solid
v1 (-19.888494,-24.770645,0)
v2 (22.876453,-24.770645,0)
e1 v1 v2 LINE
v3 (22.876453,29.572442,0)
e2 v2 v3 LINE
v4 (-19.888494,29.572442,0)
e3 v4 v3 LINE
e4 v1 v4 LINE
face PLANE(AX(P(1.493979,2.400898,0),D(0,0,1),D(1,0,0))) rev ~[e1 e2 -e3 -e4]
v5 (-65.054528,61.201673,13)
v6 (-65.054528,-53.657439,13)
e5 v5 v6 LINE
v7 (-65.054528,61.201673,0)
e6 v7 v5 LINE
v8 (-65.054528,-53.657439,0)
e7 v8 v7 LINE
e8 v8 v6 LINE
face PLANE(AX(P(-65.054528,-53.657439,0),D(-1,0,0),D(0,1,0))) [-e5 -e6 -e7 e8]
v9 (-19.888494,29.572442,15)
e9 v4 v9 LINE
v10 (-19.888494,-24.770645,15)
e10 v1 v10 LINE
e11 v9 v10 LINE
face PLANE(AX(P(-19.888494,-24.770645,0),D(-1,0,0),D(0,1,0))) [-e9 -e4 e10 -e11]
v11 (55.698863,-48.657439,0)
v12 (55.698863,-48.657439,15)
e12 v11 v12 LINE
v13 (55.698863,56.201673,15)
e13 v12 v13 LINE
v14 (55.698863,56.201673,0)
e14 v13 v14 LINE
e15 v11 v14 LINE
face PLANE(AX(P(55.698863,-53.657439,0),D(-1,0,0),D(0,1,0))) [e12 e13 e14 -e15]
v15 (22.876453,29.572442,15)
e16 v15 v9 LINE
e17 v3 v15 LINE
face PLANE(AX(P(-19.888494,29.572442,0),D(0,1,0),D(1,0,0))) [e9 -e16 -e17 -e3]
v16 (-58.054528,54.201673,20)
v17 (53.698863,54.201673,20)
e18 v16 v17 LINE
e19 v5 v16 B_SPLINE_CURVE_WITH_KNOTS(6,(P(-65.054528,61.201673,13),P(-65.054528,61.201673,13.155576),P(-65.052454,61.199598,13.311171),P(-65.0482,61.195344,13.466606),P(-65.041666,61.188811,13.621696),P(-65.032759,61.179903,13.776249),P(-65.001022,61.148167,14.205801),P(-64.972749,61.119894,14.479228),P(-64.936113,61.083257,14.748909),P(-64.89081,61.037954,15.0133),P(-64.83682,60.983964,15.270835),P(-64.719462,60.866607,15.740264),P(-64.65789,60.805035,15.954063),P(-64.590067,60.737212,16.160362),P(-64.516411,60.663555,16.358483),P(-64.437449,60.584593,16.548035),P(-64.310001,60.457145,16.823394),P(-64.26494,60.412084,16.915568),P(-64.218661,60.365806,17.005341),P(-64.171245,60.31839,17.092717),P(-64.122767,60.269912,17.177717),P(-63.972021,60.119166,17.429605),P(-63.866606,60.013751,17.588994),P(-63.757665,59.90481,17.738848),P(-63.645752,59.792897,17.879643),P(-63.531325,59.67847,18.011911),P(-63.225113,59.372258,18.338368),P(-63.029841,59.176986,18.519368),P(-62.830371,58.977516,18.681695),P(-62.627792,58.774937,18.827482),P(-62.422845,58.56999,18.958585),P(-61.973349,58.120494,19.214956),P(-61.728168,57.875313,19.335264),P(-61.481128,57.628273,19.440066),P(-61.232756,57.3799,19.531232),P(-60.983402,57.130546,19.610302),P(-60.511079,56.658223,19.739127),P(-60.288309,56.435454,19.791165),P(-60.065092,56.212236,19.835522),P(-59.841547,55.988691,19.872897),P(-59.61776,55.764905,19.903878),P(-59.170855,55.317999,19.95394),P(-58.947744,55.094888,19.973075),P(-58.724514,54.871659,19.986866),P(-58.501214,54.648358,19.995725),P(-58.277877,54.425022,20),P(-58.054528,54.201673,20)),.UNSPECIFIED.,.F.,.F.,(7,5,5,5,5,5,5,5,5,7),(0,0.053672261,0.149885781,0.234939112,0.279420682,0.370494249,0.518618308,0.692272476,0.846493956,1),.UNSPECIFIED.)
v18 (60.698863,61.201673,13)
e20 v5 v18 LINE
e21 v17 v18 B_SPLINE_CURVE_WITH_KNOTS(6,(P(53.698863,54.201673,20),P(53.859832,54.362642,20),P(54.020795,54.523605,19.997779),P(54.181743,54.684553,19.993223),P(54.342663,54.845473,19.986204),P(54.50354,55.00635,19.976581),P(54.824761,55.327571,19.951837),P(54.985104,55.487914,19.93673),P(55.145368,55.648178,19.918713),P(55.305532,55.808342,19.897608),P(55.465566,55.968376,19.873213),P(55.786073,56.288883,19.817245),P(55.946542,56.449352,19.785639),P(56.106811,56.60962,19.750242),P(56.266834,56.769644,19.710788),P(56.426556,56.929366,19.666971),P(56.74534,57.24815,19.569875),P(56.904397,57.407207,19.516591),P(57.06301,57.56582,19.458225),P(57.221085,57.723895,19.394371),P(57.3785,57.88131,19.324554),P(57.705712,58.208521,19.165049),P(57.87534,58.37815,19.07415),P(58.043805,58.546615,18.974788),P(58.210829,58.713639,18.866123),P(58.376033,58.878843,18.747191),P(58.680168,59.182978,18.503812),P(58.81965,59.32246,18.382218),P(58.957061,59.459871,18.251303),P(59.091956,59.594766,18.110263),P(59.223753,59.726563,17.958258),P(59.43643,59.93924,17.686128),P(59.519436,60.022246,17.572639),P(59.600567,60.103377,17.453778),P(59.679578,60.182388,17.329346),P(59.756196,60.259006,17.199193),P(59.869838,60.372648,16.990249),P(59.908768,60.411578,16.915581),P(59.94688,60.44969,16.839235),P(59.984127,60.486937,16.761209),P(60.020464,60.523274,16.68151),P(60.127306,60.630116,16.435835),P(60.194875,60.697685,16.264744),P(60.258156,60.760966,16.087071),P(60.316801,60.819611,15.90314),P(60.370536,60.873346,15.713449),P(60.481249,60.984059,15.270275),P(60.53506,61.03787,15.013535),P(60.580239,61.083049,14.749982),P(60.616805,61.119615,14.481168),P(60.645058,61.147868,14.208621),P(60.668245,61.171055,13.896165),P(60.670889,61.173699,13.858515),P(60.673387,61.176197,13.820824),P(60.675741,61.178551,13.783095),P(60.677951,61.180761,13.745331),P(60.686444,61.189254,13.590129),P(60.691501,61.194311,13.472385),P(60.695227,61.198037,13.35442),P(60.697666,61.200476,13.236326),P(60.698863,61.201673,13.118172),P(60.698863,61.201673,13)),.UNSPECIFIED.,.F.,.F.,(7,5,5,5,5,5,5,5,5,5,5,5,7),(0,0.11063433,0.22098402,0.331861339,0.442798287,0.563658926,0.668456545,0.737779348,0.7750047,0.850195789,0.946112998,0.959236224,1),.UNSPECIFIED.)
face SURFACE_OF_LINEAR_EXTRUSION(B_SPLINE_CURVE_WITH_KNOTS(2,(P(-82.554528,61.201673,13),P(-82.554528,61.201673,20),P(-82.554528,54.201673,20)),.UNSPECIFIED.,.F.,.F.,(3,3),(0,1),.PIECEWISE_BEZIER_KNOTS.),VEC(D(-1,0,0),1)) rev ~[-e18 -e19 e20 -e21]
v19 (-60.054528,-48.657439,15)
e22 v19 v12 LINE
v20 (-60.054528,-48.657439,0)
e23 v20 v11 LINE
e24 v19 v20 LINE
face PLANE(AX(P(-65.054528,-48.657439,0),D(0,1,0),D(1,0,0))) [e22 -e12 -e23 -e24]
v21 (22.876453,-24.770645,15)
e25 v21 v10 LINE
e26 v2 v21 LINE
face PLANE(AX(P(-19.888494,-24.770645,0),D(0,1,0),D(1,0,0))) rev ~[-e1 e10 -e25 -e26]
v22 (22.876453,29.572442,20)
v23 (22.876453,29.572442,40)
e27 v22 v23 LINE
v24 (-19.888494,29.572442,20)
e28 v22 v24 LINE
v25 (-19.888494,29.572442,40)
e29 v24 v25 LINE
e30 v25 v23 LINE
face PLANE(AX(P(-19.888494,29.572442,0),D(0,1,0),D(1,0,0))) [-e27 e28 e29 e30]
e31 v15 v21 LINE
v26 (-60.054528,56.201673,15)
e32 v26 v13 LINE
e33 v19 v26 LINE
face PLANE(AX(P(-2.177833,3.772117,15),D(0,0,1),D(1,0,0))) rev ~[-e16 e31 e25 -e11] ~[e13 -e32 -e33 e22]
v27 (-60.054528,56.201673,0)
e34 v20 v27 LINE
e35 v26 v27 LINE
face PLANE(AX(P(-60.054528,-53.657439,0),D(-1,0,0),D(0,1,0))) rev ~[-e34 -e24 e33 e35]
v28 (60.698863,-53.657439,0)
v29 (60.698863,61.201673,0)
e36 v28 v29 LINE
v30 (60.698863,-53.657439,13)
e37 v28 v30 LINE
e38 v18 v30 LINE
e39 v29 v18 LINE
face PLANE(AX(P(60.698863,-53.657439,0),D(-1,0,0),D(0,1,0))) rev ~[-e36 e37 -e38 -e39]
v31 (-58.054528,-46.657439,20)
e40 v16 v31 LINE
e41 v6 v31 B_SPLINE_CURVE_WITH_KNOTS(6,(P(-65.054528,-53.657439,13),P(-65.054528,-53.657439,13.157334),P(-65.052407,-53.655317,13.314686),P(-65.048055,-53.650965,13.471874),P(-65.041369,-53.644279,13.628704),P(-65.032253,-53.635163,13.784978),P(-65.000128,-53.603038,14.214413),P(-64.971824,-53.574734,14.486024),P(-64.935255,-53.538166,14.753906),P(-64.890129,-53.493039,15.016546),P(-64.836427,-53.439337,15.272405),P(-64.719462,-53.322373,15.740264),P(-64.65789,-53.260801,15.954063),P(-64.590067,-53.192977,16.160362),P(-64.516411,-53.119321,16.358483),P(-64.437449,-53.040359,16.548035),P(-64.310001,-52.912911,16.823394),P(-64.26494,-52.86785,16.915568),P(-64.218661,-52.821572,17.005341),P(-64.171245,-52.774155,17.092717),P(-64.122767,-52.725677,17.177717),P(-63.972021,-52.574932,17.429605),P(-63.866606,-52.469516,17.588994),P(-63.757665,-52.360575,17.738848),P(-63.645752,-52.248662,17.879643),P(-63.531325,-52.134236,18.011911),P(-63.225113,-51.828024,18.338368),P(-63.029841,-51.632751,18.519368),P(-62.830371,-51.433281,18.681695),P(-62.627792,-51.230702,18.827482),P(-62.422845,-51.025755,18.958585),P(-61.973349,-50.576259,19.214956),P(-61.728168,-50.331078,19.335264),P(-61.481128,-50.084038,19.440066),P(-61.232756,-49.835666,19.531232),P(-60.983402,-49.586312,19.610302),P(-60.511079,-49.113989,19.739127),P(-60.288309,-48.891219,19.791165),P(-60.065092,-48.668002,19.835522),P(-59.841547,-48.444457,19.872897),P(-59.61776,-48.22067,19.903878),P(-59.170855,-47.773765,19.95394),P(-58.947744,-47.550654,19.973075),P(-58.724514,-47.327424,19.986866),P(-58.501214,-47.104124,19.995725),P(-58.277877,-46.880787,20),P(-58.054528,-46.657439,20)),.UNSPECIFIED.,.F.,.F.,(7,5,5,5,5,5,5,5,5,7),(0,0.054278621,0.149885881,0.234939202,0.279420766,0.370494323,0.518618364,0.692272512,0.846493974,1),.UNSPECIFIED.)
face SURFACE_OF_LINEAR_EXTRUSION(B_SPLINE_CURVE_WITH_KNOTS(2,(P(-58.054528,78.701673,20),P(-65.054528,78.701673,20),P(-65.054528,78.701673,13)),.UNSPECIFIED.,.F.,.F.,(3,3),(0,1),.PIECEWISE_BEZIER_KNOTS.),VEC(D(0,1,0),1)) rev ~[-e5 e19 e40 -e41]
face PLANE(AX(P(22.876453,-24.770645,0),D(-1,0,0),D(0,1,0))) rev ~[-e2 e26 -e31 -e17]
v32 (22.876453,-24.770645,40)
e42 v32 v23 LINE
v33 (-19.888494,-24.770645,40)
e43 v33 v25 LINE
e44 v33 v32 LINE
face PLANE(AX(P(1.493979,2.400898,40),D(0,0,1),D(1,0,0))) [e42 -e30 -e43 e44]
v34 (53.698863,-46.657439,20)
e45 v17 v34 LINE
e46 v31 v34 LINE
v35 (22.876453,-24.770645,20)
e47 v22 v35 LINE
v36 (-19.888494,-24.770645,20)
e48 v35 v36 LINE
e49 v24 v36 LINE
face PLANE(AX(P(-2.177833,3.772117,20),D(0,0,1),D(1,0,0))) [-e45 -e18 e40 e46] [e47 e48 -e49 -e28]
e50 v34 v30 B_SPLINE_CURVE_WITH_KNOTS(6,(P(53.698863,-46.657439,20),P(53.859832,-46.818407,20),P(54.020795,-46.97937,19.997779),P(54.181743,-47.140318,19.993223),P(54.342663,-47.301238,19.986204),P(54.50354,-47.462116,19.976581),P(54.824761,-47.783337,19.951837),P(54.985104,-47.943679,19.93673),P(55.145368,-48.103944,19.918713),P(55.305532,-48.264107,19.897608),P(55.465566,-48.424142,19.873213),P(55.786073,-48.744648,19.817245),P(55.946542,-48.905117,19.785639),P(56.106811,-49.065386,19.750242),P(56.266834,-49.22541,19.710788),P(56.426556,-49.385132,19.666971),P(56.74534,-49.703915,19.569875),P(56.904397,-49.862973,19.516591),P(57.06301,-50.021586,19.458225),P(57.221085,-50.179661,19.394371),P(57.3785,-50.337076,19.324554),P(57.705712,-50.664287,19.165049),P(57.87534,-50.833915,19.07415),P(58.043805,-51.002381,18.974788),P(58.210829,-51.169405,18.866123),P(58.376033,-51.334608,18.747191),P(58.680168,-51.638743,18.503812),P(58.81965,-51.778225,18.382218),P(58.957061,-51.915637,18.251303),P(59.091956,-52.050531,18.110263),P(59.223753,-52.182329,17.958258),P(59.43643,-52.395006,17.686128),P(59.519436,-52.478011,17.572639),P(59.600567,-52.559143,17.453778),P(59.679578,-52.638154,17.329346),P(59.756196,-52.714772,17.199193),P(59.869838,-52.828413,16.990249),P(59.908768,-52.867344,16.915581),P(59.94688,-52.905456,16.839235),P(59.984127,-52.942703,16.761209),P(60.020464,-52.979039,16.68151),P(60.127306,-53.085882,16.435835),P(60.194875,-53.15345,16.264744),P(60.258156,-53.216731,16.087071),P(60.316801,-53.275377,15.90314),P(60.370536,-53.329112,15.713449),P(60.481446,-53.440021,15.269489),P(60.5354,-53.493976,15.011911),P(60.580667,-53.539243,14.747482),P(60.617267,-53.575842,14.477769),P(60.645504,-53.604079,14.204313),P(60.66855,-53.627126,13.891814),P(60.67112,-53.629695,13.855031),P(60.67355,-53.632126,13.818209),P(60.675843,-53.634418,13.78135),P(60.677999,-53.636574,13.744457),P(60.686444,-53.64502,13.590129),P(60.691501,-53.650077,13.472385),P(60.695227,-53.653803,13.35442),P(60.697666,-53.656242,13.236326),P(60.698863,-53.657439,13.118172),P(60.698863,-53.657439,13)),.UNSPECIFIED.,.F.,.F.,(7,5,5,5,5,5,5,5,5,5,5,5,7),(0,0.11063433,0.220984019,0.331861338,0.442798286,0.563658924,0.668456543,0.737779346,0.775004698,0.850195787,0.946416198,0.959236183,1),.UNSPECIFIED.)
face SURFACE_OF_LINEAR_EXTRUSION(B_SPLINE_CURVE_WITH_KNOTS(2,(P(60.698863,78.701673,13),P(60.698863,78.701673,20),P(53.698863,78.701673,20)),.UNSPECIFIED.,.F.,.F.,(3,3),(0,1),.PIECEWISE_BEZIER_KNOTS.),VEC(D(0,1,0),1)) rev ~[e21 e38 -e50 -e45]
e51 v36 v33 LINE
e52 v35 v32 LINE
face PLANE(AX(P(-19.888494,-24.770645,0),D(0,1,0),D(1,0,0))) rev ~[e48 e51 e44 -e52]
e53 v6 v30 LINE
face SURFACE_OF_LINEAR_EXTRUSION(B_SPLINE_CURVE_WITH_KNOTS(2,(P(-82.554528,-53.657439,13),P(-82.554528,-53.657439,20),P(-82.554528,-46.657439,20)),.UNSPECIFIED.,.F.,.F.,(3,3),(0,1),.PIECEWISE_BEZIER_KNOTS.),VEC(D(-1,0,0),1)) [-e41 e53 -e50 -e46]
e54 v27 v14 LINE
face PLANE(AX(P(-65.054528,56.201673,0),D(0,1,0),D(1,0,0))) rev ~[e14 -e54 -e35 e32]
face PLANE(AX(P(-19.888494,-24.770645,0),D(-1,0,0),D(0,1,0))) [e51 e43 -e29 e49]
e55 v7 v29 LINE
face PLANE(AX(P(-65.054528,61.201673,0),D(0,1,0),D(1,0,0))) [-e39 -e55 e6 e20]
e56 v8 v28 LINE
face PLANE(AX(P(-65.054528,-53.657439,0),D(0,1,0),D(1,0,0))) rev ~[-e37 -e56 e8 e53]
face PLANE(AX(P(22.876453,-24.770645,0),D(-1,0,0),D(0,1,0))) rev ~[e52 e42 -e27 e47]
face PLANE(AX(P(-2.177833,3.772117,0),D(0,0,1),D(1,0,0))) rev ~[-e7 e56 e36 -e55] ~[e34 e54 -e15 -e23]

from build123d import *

# Parameters (mm, degrees)
F1_W        = 125.7533915341
F1_H        = 114.8591116071
F2_DEPTH    = 20
F3_T        = -5
F5_W        = 42.7649468184
F5_H        = 54.3430875987
F6_DEPTH    = 40
F7_T1_DEPTH = 149.8591116071
F7_T3_DEPTH = 160.7533915341


# Not quite as in the source:
# - a fillet or chamfer that OpenCascade refuses, or shapes differently, is made with other operations: its cross-section is extruded or revolved along the edge and cut away or added


with BuildPart() as f2:
    # F1 (on face) → F2 (new body)
    with BuildSketch(Plane.XY):
        with Locations((-2.1778326482, 3.7721171975)):
            Rectangle(F1_W, F1_H)
    extrude(amount=F2_DEPTH)

    # F3
    f3_openings = [f2.faces().sort_by_distance(p)[0] for p in [
        (-2.177833, 3.772117, 0),
    ]]
    offset(amount=F3_T, openings=f3_openings)

    # F5 (on Top) → F6 (join)
    with BuildSketch(Plane.XY):
        with Locations((1.4939792454, 2.4008983746)):
            Rectangle(F5_W, F5_H)
    extrude(amount=F6_DEPTH)

    # F7: fillet of radius 7 on 4 edges, made by hand

    # F7_s2 → F7_t1 (cut)
    with BuildSketch(Plane.XZ.offset(-78.7016730011)):
        with BuildLine():
            add(Edge.make_bspline(
                [(-58.0545284152, 20), (-65.0545284152, 20), (-65.0545284152, 13)],
                knots=[0, 0, 0, 1, 1, 1], degree=2, weights=[1, 1, 1]))
            Line((-65.0545284152, 13), (-65.0545284152, 20))
            Line((-65.0545284152, 20), (-58.0545284152, 20))
        make_face()
        with BuildLine():
            add(Edge.make_bspline(
                [(60.6988631189, 13), (60.6988631189, 20), (53.6988631189, 20)],
                knots=[0, 0, 0, 1, 1, 1], degree=2, weights=[1, 1, 1]))
            Line((53.6988631189, 20), (60.6988631189, 20))
            Line((60.6988631189, 20), (60.6988631189, 13))
        make_face()
    extrude(amount=F7_T1_DEPTH, mode=Mode.SUBTRACT)

    # F7_s4 → F7_t3 (cut)
    with BuildSketch(Plane.YZ.offset(-82.5545284152)):
        with BuildLine():
            add(Edge.make_bspline(
                [(-53.657438606, 13), (-53.657438606, 20), (-46.657438606, 20)],
                knots=[0, 0, 0, 1, 1, 1], degree=2, weights=[1, 1, 1]))
            Line((-46.657438606, 20), (-53.657438606, 20))
            Line((-53.657438606, 20), (-53.657438606, 13))
        make_face()
        with BuildLine():
            add(Edge.make_bspline(
                [(61.2016730011, 13), (61.2016730011, 20), (54.2016730011, 20)],
                knots=[0, 0, 0, 1, 1, 1], degree=2, weights=[1, 1, 1]))
            Line((54.2016730011, 20), (61.2016730011, 20))
            Line((61.2016730011, 20), (61.2016730011, 13))
        make_face()
    extrude(amount=F7_T3_DEPTH, mode=Mode.SUBTRACT)


solid = f2.part
